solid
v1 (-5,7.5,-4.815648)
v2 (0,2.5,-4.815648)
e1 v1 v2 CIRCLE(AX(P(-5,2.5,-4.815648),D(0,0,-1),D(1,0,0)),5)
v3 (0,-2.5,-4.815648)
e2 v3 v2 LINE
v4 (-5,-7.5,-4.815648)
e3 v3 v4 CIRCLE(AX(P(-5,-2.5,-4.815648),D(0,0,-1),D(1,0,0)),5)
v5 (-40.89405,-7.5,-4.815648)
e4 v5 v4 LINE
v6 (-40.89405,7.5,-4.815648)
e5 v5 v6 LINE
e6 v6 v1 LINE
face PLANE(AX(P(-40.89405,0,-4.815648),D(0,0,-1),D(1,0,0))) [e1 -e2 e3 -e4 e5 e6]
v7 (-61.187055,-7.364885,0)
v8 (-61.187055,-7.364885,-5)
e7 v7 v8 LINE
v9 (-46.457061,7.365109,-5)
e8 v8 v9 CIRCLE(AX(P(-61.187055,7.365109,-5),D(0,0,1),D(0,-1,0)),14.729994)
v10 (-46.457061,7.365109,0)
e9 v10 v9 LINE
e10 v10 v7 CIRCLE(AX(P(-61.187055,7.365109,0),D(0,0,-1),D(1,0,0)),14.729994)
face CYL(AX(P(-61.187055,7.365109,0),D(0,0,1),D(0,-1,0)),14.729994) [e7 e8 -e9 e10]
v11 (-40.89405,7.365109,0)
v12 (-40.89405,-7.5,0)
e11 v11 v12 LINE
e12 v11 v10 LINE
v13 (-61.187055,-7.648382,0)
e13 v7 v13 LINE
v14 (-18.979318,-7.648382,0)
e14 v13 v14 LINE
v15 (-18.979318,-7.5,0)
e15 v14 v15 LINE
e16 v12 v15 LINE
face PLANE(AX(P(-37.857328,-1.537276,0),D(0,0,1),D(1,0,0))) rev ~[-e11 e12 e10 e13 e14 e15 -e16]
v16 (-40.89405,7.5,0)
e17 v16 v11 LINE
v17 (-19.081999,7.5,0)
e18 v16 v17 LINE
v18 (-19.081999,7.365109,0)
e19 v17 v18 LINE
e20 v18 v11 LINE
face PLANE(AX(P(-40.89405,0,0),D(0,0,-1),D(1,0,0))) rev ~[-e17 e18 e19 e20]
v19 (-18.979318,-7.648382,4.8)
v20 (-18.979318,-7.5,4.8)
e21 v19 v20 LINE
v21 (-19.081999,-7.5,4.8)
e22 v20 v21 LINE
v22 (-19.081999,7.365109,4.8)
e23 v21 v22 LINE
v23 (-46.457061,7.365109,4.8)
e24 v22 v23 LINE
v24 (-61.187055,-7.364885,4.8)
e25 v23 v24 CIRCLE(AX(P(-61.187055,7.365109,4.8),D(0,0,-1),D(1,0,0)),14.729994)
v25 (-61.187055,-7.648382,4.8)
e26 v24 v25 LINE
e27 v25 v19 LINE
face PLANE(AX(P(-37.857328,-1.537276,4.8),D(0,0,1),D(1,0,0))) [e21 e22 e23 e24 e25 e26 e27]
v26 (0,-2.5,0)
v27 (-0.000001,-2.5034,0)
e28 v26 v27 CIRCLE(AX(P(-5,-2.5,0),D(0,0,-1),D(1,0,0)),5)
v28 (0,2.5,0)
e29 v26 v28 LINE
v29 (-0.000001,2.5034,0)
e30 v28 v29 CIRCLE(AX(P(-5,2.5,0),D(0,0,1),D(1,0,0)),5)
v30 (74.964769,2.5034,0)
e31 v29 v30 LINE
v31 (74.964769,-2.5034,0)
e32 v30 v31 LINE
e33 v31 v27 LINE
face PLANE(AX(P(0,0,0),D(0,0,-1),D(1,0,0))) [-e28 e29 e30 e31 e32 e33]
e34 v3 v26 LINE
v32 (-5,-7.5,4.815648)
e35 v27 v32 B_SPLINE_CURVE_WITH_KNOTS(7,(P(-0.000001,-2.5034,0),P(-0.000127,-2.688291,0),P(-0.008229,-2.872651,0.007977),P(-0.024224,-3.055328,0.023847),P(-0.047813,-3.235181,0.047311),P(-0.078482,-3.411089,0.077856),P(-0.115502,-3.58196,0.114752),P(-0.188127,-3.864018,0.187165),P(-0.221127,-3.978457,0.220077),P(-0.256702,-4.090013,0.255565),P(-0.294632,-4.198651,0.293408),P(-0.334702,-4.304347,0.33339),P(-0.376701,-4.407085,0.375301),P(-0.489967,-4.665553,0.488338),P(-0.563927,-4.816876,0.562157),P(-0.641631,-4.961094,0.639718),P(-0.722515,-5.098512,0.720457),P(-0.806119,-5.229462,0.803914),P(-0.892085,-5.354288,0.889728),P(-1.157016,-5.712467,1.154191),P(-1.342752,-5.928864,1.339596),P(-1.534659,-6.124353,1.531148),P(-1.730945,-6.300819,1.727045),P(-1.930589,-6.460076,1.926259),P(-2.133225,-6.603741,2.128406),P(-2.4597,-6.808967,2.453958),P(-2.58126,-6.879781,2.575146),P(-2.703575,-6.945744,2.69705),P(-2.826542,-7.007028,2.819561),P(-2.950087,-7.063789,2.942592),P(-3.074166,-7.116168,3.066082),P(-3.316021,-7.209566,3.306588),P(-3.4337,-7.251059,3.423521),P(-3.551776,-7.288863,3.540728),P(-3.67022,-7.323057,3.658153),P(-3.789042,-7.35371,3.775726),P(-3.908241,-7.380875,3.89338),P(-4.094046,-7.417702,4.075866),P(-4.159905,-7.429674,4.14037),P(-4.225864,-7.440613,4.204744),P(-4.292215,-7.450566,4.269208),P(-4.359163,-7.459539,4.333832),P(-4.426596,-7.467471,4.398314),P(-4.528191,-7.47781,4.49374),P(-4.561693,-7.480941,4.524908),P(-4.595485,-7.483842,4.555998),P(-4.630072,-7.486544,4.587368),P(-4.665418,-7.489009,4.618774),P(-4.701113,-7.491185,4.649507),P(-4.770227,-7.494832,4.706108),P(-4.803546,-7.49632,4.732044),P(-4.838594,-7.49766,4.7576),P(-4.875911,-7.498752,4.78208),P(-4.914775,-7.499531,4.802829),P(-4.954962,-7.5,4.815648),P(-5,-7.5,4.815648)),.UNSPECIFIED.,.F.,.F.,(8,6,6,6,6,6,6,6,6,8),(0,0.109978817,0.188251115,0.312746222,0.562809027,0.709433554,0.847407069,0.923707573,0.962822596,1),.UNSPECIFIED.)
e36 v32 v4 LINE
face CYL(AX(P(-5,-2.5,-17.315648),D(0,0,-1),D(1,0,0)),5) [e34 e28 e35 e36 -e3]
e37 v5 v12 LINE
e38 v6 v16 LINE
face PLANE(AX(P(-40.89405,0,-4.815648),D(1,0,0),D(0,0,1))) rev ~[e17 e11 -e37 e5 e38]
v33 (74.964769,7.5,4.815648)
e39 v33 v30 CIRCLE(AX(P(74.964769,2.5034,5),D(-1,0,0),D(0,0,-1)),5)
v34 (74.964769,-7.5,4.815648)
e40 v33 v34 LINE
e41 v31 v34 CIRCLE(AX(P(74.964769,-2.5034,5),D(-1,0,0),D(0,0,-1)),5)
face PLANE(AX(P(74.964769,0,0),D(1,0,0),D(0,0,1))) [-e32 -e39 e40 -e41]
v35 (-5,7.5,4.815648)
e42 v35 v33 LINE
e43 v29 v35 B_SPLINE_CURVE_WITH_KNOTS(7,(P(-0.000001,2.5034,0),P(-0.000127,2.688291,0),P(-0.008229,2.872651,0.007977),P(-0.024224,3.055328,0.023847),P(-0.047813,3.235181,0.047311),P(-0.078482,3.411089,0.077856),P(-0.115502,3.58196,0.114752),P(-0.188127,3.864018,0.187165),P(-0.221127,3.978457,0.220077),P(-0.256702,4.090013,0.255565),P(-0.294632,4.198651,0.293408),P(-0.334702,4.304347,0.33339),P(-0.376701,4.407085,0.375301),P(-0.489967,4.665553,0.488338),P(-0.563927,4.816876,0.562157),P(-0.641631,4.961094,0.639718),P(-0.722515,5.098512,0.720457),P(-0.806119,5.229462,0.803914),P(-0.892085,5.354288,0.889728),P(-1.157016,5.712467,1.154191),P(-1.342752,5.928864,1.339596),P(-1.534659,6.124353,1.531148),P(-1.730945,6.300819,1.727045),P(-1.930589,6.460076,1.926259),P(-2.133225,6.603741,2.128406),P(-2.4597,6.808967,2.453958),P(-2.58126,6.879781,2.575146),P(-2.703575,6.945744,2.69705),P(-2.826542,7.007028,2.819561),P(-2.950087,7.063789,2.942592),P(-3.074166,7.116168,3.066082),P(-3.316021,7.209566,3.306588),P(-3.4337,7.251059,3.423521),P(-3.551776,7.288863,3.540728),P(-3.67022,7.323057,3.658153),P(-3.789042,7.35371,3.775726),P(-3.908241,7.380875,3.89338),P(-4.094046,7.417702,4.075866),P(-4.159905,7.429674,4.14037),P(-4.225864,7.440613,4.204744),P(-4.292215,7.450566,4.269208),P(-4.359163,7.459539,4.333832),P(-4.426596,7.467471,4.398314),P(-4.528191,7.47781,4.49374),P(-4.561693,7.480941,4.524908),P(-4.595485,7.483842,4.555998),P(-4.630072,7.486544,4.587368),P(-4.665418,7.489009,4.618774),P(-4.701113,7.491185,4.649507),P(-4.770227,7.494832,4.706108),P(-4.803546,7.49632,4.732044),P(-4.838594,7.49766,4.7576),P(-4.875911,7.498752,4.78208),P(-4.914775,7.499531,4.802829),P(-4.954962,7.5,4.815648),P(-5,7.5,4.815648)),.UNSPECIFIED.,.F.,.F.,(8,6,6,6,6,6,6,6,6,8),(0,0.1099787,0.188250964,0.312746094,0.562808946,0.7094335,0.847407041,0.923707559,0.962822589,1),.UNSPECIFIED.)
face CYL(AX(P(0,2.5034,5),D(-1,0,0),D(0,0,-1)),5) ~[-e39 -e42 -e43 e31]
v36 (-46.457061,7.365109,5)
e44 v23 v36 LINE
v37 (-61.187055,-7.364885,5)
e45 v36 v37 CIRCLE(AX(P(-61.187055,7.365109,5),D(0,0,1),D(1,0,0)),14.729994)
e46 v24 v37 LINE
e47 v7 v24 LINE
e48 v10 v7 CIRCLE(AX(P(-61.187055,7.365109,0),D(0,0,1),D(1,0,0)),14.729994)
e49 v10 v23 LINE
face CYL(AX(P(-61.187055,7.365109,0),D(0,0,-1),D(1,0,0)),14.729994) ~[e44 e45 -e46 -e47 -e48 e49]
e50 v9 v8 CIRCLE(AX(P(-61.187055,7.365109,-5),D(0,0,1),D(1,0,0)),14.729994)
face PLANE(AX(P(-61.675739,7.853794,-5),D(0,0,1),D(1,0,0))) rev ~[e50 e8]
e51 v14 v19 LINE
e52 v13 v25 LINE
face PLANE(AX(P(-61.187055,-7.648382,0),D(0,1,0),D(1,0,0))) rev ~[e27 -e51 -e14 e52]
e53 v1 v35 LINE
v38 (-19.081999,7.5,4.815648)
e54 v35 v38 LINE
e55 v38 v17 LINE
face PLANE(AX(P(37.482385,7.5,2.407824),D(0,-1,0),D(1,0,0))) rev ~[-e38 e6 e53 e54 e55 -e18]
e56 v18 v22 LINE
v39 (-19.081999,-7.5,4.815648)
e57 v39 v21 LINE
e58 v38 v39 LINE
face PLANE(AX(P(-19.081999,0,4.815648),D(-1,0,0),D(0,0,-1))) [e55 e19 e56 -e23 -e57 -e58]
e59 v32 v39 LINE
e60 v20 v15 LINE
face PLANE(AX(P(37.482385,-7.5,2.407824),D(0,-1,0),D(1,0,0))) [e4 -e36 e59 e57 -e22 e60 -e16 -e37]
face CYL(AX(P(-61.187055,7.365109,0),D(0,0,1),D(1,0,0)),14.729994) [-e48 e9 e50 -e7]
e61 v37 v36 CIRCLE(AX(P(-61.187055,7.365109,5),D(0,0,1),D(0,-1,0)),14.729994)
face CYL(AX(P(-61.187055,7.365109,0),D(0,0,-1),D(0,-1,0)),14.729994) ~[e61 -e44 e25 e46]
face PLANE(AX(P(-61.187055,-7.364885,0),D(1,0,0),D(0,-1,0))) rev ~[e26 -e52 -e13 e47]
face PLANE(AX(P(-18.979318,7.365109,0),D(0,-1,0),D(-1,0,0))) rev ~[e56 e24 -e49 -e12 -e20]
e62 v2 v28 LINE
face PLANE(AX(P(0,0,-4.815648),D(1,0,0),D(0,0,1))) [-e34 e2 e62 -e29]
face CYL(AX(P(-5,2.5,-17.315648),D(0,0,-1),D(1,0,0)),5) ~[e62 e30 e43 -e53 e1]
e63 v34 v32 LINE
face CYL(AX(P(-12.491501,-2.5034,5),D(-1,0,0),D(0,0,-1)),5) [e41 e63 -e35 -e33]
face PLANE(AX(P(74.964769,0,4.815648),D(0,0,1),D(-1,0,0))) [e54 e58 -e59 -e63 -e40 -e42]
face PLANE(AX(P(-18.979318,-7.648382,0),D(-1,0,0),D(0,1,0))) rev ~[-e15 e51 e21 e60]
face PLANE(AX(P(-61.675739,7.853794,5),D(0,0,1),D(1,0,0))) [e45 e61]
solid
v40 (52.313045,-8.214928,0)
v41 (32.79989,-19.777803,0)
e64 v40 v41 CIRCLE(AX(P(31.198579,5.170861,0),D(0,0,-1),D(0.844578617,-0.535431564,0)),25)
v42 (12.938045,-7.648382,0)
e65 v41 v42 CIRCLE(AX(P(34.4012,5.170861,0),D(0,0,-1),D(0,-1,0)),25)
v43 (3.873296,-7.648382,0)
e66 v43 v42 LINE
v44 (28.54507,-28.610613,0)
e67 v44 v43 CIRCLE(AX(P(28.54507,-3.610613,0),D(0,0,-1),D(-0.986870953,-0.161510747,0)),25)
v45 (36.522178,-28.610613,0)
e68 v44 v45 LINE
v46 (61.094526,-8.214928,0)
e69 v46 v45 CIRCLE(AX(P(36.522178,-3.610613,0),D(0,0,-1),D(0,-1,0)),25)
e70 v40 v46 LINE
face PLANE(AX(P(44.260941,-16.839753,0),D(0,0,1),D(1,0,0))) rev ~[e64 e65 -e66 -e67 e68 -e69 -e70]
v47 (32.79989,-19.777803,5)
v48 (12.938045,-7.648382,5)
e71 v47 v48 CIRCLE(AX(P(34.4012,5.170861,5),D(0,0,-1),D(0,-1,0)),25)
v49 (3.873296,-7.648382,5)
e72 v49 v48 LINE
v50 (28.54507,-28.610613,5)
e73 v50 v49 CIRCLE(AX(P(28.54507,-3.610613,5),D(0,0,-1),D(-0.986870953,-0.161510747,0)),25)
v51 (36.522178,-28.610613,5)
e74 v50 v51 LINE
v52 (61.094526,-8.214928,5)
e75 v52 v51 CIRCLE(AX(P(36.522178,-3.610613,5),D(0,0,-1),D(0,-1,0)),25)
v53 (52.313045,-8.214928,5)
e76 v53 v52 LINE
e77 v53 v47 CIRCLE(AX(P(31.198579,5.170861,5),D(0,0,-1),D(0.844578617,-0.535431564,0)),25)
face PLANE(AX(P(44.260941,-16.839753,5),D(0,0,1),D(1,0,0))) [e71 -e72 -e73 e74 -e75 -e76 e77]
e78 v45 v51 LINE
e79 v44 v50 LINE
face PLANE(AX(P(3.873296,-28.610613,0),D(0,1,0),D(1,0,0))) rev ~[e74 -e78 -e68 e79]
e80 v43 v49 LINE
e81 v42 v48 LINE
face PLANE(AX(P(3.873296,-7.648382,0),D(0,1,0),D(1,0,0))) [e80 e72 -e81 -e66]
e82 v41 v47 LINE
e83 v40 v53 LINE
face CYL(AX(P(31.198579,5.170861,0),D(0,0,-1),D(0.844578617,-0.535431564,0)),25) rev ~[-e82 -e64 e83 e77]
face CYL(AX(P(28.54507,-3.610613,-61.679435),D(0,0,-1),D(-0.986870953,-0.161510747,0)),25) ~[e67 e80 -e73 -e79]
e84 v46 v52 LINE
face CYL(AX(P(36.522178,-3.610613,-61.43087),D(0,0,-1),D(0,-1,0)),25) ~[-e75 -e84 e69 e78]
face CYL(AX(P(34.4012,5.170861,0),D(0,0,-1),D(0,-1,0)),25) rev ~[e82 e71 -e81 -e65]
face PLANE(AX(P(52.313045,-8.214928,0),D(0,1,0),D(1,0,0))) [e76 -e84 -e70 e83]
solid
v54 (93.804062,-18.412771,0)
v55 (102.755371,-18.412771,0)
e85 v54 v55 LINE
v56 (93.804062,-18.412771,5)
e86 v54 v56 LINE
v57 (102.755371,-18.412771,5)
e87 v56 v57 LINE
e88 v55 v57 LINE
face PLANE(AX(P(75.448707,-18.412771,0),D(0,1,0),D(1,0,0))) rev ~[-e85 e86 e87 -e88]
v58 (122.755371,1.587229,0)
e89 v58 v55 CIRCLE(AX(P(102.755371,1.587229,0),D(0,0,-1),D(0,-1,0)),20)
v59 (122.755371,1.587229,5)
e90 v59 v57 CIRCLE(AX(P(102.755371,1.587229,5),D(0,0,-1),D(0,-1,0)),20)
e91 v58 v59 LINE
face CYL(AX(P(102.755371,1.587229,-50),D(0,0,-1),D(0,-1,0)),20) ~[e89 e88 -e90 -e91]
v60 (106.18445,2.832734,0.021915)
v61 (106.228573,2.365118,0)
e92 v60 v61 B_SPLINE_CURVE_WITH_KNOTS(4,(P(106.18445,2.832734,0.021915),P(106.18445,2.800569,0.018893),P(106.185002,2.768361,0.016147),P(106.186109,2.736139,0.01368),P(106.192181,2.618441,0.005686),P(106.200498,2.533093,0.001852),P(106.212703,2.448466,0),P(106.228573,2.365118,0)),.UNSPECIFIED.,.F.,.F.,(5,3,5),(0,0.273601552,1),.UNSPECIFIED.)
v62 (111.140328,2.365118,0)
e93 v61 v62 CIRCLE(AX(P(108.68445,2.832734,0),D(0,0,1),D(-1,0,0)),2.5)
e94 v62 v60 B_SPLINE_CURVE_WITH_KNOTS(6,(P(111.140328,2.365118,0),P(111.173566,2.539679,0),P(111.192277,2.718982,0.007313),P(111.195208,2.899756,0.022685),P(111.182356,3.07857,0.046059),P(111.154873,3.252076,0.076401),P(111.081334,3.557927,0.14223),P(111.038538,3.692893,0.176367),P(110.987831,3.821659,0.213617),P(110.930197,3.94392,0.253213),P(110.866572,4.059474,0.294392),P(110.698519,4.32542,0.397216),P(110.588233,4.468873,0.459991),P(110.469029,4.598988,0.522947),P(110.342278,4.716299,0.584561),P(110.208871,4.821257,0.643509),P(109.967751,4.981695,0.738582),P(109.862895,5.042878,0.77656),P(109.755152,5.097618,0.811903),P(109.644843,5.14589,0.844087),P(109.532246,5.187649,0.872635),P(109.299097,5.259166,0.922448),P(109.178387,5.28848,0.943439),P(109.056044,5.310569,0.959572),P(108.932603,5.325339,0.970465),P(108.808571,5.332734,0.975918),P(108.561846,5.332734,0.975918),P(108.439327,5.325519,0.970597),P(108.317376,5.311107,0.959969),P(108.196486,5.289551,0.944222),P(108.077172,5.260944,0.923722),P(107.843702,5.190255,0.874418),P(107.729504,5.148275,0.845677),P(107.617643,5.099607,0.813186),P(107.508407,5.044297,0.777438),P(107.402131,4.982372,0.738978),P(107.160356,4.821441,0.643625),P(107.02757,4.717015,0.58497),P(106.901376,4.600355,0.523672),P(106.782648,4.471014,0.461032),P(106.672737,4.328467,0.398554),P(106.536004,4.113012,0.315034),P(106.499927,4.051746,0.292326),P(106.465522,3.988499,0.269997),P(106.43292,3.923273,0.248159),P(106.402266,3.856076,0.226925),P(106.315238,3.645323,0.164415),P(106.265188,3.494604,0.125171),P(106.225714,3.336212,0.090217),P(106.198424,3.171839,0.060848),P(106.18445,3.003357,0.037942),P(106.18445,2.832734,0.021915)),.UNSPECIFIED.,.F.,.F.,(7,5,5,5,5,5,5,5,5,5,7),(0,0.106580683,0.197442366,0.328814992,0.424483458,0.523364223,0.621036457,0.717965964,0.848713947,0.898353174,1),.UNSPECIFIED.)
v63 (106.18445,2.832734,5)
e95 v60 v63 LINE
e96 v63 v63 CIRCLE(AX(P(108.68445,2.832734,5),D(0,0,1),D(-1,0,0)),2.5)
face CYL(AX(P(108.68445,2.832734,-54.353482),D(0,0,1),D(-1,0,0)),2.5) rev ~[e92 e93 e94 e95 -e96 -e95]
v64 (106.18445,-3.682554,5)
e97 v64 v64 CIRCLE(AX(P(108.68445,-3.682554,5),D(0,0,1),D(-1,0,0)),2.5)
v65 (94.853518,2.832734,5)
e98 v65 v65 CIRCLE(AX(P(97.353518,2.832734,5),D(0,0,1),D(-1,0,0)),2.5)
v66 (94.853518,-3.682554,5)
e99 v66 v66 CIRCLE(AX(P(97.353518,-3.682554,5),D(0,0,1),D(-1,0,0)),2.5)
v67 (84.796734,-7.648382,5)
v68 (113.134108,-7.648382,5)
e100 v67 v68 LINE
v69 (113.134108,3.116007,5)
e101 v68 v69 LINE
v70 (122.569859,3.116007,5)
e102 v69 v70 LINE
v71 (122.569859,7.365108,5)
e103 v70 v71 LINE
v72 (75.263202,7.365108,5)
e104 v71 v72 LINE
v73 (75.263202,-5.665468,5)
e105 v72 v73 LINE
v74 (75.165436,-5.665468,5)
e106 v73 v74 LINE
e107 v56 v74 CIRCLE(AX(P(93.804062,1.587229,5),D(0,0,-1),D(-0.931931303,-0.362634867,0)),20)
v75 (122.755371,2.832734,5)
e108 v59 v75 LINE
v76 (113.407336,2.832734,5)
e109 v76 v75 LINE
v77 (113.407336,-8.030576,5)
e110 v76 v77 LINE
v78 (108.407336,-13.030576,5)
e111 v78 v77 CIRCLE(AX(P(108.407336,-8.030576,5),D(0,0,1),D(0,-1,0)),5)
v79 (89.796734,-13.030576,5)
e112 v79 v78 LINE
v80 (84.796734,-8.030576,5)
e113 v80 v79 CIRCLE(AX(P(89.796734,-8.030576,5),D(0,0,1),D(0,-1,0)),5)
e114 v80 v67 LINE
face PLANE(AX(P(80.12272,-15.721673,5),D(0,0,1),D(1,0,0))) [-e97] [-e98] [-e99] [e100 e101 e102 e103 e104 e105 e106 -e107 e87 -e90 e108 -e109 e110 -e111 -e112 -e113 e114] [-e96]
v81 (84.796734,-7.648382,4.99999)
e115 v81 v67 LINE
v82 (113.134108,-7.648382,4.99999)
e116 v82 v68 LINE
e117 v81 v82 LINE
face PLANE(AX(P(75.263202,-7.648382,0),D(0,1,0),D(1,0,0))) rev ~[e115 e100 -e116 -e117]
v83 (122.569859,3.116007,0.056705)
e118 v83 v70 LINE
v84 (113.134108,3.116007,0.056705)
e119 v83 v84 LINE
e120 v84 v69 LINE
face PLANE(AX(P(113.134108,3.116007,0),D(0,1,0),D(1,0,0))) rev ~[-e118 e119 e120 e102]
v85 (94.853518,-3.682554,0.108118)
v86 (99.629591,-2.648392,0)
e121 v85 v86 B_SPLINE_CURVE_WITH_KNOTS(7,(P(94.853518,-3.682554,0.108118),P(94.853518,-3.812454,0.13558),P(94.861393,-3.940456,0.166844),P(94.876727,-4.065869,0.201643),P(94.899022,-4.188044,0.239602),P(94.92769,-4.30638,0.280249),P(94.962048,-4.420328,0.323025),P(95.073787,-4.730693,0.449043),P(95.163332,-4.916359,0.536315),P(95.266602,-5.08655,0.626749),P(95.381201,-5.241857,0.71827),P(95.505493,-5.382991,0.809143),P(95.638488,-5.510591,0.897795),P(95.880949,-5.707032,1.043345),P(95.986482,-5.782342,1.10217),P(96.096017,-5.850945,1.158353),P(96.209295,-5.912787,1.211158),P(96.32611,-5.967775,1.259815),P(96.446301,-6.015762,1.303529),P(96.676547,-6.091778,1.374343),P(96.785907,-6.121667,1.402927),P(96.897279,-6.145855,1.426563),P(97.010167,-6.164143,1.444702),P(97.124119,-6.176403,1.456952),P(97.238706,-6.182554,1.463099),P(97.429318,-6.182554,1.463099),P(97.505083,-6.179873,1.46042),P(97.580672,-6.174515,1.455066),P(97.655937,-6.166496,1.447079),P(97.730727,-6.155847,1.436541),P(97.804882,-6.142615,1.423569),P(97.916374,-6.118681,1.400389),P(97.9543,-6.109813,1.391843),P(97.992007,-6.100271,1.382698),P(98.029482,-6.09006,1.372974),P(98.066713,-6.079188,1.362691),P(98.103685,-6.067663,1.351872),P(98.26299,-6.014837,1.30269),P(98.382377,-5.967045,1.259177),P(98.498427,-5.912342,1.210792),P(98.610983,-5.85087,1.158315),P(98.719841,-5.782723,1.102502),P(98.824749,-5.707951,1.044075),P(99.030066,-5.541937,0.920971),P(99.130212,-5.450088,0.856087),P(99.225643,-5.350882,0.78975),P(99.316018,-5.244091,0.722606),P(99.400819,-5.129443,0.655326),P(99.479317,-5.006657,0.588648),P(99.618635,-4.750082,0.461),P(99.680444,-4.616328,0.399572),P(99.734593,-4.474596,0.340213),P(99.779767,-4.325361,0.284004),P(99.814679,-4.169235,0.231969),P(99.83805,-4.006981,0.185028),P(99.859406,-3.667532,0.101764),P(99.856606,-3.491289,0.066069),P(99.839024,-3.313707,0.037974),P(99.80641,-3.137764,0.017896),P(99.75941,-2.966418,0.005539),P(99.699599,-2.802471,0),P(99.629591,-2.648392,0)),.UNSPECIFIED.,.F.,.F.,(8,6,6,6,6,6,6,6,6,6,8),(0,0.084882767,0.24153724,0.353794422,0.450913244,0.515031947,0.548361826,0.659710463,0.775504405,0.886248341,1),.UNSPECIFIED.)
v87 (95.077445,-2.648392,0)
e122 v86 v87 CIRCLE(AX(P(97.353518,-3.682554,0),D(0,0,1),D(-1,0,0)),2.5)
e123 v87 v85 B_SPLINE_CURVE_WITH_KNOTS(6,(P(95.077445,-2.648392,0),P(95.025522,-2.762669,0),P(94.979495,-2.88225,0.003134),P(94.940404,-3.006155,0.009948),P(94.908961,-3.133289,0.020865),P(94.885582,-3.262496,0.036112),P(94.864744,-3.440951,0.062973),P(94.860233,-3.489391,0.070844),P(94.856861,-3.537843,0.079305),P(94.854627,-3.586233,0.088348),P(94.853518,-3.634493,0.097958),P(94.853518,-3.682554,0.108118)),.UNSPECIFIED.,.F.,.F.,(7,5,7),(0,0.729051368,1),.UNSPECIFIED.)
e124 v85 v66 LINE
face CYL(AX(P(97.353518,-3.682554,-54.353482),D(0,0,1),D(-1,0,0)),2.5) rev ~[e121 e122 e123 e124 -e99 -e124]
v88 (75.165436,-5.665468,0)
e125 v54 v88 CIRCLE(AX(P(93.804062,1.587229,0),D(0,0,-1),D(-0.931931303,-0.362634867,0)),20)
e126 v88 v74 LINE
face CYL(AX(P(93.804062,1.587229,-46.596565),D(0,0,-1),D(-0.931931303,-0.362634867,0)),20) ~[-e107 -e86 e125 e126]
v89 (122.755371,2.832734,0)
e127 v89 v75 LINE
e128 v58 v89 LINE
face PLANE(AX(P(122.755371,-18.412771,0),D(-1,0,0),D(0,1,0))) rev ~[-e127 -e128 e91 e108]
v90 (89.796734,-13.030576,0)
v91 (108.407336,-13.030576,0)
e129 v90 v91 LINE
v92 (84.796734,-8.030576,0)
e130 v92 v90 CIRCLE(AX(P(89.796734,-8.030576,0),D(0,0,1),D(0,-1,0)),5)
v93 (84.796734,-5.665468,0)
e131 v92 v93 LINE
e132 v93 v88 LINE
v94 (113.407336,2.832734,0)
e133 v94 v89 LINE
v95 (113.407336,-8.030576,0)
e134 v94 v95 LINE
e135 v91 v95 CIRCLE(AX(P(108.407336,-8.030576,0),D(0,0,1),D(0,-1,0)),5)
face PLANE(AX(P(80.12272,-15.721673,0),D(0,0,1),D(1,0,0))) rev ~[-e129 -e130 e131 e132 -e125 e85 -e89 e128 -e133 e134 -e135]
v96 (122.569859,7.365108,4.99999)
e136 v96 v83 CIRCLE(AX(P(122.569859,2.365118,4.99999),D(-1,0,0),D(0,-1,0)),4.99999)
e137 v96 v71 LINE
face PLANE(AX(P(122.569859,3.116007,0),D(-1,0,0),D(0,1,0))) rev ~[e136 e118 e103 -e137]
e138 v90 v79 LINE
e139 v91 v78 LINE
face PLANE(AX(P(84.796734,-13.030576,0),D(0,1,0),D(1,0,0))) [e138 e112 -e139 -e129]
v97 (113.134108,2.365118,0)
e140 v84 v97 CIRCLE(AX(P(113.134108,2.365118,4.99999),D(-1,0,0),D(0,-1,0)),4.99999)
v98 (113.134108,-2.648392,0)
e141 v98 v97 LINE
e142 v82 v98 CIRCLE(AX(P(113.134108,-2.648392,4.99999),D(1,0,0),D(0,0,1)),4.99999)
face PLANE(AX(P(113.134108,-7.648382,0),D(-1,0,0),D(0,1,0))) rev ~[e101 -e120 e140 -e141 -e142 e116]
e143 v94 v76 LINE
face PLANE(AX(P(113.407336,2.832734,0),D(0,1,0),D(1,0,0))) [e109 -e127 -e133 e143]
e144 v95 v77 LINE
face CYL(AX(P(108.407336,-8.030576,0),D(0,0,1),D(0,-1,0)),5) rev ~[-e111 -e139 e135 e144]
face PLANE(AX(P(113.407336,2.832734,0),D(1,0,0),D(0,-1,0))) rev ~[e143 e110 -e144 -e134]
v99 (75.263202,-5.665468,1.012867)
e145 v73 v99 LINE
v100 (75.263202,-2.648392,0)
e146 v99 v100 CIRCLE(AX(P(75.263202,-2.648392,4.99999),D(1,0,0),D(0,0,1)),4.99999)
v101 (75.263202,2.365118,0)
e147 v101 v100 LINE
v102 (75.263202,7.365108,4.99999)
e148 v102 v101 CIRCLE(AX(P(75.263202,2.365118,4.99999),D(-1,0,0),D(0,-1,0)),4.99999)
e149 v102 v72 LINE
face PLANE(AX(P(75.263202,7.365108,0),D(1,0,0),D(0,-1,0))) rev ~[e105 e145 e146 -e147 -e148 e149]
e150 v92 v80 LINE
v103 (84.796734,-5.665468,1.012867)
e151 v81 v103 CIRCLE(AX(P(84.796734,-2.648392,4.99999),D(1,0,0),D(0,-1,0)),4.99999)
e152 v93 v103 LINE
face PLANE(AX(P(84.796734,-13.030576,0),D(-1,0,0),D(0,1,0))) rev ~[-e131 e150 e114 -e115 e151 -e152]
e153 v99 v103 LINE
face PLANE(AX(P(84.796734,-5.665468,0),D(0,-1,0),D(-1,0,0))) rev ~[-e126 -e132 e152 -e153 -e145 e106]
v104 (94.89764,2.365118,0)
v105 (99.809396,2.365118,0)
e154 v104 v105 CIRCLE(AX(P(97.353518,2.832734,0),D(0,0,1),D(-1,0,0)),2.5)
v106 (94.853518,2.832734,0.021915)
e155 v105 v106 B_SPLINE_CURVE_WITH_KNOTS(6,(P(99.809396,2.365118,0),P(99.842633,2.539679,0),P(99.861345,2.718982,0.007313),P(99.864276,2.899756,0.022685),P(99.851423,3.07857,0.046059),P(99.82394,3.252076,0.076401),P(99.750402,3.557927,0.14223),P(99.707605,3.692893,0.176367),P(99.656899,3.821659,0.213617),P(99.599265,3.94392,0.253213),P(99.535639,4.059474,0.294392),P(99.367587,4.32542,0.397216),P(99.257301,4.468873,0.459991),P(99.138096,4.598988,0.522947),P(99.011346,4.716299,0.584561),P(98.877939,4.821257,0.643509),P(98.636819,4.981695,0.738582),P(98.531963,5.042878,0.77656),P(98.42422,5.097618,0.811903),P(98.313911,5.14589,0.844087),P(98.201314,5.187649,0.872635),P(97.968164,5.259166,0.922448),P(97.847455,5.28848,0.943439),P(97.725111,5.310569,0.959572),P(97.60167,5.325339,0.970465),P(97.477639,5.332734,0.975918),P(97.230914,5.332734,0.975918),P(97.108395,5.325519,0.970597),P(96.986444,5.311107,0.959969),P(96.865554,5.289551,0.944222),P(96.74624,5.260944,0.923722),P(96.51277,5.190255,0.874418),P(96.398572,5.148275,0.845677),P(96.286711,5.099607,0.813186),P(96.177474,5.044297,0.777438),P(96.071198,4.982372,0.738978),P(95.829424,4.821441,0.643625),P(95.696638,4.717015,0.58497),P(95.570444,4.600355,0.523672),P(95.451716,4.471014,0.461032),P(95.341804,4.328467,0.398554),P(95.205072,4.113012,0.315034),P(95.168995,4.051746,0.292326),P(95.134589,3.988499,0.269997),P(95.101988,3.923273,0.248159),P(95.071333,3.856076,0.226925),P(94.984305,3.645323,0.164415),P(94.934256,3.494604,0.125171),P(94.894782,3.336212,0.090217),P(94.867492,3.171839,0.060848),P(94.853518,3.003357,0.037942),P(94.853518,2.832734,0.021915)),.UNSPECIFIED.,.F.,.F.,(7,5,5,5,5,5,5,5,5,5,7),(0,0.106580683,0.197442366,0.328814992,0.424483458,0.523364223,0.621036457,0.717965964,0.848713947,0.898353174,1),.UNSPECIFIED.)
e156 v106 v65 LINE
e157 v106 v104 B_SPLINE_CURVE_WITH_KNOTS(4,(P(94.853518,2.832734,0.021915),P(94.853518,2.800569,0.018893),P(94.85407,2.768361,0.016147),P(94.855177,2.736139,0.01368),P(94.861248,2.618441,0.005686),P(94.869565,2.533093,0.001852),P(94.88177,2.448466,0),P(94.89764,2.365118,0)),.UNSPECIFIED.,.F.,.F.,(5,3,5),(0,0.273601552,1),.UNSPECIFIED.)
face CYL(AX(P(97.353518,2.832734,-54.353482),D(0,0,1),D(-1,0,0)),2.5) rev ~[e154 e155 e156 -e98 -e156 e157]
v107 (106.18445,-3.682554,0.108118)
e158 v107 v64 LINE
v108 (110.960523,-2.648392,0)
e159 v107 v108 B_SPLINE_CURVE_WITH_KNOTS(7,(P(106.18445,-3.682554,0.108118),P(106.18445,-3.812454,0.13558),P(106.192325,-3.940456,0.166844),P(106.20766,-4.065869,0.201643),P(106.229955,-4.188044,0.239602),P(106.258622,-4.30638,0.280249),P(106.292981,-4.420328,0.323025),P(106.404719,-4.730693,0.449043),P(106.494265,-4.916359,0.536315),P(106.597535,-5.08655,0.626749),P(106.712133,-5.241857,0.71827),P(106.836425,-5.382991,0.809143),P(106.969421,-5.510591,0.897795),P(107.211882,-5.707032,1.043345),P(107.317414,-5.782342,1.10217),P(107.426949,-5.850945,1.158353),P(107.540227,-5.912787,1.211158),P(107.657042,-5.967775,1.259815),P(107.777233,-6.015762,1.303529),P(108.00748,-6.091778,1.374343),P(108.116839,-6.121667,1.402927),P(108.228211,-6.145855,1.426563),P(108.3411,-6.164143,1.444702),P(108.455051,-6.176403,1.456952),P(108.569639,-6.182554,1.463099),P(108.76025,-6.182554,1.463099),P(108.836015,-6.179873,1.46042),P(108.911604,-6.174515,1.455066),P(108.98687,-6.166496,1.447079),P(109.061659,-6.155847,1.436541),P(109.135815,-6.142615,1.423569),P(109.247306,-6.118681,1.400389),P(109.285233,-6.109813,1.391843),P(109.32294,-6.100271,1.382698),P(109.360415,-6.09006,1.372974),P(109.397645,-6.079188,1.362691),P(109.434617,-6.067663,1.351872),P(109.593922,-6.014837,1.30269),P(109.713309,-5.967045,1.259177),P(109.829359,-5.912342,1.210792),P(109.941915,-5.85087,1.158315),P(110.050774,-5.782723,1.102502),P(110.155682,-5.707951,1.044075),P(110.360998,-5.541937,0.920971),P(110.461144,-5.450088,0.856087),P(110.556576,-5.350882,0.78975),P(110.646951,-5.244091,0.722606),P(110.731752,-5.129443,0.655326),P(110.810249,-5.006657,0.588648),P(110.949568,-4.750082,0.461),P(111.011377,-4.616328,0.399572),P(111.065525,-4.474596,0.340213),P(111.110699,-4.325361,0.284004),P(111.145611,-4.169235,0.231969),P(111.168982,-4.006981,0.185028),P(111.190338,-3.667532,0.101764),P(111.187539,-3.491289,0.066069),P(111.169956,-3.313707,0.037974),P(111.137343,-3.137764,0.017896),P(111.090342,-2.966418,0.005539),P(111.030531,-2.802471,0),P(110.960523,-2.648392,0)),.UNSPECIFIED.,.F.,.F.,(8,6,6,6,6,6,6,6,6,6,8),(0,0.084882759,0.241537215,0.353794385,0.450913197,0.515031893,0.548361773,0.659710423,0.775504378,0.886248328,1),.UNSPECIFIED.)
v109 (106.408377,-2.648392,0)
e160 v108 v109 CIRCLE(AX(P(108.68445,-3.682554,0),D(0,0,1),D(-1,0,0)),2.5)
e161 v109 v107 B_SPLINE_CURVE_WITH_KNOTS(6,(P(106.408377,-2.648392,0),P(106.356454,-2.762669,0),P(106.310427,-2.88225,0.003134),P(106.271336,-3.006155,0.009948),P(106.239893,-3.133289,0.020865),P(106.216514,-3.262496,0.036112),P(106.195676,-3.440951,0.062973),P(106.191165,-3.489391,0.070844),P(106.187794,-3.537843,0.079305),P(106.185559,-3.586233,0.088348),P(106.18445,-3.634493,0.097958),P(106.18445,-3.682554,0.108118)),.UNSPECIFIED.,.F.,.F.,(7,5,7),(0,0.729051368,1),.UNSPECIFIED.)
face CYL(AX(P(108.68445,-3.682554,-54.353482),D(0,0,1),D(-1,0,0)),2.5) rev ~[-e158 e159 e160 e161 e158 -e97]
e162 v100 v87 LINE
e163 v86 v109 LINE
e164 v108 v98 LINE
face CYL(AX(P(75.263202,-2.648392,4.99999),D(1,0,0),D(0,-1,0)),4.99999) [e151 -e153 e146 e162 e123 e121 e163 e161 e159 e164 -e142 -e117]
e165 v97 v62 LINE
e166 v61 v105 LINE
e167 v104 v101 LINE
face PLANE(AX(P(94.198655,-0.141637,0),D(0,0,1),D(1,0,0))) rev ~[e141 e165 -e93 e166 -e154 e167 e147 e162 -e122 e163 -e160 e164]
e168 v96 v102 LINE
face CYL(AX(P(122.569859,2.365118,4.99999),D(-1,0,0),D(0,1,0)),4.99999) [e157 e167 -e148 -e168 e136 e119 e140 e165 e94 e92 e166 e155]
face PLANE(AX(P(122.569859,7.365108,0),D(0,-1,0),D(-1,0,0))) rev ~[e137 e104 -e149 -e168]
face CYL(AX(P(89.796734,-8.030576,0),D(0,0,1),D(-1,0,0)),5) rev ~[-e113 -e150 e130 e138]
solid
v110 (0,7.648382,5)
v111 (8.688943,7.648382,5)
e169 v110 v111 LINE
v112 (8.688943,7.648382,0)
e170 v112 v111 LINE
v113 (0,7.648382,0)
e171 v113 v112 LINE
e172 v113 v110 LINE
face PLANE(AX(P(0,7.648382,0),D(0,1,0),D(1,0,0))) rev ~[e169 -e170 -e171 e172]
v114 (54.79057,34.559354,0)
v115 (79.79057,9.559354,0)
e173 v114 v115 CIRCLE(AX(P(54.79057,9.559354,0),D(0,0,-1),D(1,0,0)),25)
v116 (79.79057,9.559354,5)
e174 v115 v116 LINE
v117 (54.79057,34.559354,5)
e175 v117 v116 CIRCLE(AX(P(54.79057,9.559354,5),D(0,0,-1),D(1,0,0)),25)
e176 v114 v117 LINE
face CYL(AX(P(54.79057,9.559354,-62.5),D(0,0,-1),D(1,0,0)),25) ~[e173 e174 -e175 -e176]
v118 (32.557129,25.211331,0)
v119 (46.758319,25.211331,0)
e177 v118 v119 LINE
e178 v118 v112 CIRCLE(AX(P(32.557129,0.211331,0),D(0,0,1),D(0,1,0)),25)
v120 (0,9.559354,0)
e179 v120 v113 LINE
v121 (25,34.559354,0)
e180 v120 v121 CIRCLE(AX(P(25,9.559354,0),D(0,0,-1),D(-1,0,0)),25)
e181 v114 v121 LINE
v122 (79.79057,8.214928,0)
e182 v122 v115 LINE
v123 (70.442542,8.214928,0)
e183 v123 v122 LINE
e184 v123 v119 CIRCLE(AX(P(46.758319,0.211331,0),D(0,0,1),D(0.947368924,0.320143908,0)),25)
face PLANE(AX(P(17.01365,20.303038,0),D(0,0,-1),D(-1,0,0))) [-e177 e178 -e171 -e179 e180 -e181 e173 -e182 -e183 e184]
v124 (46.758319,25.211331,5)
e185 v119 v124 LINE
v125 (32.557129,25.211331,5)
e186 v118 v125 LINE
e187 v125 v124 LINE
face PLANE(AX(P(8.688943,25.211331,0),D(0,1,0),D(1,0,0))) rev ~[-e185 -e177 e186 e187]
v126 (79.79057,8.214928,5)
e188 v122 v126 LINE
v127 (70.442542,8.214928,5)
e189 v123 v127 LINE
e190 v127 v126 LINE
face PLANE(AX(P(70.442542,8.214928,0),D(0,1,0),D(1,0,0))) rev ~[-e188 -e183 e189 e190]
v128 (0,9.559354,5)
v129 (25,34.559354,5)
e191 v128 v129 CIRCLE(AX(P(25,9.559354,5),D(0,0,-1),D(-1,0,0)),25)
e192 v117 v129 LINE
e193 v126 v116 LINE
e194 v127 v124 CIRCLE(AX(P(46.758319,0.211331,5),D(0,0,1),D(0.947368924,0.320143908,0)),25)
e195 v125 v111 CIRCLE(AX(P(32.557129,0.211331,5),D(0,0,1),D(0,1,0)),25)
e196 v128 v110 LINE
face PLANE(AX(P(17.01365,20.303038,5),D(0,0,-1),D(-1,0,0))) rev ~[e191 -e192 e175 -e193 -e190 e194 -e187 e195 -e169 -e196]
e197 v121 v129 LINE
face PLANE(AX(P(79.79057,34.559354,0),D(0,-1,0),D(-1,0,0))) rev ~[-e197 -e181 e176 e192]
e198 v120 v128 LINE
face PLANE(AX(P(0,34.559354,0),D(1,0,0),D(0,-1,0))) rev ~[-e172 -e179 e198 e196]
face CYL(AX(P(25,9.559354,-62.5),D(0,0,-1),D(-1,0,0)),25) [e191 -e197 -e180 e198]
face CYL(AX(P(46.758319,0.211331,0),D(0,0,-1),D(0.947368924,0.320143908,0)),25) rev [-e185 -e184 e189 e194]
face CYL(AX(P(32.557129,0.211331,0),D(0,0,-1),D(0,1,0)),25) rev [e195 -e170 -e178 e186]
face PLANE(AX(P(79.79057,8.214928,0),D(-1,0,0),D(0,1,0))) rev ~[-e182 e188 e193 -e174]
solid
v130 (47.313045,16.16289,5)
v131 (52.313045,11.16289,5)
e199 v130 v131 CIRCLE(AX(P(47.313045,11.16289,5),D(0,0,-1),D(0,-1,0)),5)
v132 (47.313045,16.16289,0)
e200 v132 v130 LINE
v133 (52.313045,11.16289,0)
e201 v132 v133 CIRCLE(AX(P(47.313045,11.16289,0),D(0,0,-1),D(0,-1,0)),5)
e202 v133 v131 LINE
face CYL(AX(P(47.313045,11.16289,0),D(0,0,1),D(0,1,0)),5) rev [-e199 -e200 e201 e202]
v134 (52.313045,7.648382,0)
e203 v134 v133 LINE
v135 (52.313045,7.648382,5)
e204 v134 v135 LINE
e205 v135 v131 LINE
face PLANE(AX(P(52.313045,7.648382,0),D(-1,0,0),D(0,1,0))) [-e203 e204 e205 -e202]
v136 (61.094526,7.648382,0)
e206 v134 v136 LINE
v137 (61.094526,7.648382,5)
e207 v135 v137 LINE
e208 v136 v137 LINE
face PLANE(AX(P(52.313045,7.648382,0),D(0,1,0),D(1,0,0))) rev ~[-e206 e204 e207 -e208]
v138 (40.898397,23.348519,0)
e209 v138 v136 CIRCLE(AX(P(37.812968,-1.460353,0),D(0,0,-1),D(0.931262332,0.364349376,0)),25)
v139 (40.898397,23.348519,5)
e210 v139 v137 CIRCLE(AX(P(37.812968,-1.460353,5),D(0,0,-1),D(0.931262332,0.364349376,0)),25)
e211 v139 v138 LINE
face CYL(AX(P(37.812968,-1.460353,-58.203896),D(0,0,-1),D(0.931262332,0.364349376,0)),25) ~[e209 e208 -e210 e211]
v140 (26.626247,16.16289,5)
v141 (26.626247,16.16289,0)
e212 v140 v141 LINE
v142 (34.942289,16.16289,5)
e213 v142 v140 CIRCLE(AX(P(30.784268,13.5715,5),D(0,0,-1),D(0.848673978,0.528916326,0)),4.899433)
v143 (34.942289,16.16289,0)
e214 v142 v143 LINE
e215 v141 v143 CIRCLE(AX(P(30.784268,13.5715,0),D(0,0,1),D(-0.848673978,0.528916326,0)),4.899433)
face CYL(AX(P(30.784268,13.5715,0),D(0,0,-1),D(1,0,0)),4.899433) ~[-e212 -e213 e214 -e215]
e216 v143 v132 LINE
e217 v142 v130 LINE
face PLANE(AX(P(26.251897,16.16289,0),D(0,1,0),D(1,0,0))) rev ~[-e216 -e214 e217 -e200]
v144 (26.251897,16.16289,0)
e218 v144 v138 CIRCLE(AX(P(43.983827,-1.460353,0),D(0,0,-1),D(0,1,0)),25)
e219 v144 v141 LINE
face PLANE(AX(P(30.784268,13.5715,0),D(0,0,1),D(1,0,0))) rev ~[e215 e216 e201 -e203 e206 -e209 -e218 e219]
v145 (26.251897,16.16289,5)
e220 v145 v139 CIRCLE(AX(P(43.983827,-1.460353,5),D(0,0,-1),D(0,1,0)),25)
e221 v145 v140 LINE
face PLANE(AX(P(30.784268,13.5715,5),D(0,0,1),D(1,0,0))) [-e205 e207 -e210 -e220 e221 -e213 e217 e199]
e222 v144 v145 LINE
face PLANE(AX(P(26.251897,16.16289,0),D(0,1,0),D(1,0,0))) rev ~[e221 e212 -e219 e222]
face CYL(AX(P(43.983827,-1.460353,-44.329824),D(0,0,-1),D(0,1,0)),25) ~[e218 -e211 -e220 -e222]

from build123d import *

# Parameters (mm, degrees)
F0_W           = 74.9647691846
F0_H           = 4.8156478442
F0_W_2         = 21.8120515347
F1_DEPTH       = 7.5
F2_T1_DEPTH    = 87.4562698657
F2_T3_DEPTH    = 17.3156478442
F2_T9_DEPTH    = 87.4562698657
F2_T13_DEPTH   = 17.3156478442
F2_T21_DEPTH   = 87.4562698657
F2_T25_DEPTH   = 17.3156478442
F4_DEPTH       = 4.8
F5_DEPTH       = 5
F6_W           = 9.4357505441
F6_H           = 4.2491005734
F7_DEPTH       = 5
F8_R           = 4.99999
F9_W           = 9.3480274081
F9_H           = 5.3821951151
F9_W_2         = 9.3480348587
F9_H_2         = 4.8156473786
F9_H_3         = 5.5238311179
F9_W_3         = 28.6106020212
F10_DEPTH      = 5
F11_T1_DEPTH   = 98.1931302685
F11_T3_DEPTH   = 105
F13_D          = 5
F14_D          = 5
F15_D          = 5
F16_D          = 5
F17_W          = 9.3480274081
F17_H          = 16.9964022934
F17_W_2        = 61.7535989732
F17_H_2        = 9.3480236828
F18_DEPTH      = 5
F17_W_3        = 9.0647486504
F17_H_3        = 12.1807572432
F17_H_4        = 8.7814740837
F17_W_4        = 39.374999702
F17_W_5        = 8.7814815342
F17_H_5        = 11.6142109036
F17_H_6        = 8.5145081393
F17_W_6        = 26.0611474514
F17_H_7        = 7.3767574504
F19_T1_DEPTH   = 5
F19_T3_DEPTH   = 5
F19_T5_DEPTH   = 130
F19_T7_DEPTH   = 130
F19_2_T1_DEPTH = 5
F19_2_T3_DEPTH = 127.8617396979
F19_2_T5_DEPTH = 128.3588691726
F19_3_T1_DEPTH = 121.4077915609
F19_3_T3_DEPTH = 93.6596472526
F20_R          = 4.8994331179
F21_DEPTH      = 5
F22_R          = 5
F22_2_R        = 5


# Not quite as in the source:
# - a fillet or chamfer that OpenCascade refuses, or shapes differently, is made with other operations: its cross-section is extruded or revolved along the edge and cut away or added
# - a fillet or chamfer is up to 0.001 mm smaller than in the source, because OpenCascade refuses the exact size


with BuildPart() as f1:
    # F0 (on Front) → F1 (new body, symmetric)
    with BuildSketch(Plane.XZ):
        with Locations((37.4823845923, 2.4078239221)):
            Rectangle(F0_W, F0_H)
        Polygon((0, -4.8156478442), (0, 0), (0, 4.8156478442), (-19.0819986165, 4.8156478442), (-19.0819986165, 0), (-19.0819986165, -4.8156478442), align=None)
        with Locations((-29.9880243838, -2.4078239221)):
            Rectangle(F0_W_2, F0_H)
    extrude(amount=F1_DEPTH, both=True)

    # F2: fillet of radius 5 on 4 edges, made by hand

    # F2_s2 → F2_t1 (cut)
    with BuildSketch(Plane.YZ):
        with BuildLine():
            ThreePointArc((-2.5033997275, 0), (-5.9731431778, 1.3998777258), (-7.5, 4.8156478442))
            Line((-7.5, 4.8156478442), (-7.5, 0))
            Line((-7.5, 0), (-2.5033997275, 0))
        make_face()
        with BuildLine():
            ThreePointArc((2.5033997275, 0), (5.9731431778, 1.3998777258), (7.5, 4.8156478442))
            Line((7.5, 4.8156478442), (7.5, 0))
            Line((7.5, 0), (2.5033997275, 0))
        make_face()
    extrude(amount=F2_T1_DEPTH, mode=Mode.SUBTRACT)

    # F2_s4 → F2_t3 (cut)
    with BuildSketch(Plane.XY.offset(-17.3156478442)):
        with BuildLine():
            ThreePointArc((0, -2.5), (-1.4644660941, -6.0355339059), (-5, -7.5))
            Line((-5, -7.5), (0, -7.5))
            Line((0, -7.5), (0, -2.5))
        make_face()
        with BuildLine():
            ThreePointArc((0, 2.5), (-1.4644660941, 6.0355339059), (-5, 7.5))
            Line((-5, 7.5), (0, 7.5))
            Line((0, 7.5), (0, 2.5))
        make_face()
    extrude(amount=F2_T3_DEPTH, mode=Mode.SUBTRACT)


with BuildPart() as f2_tool7:
    # F2_s8 → F2_t9 (new body)
    with BuildSketch(Plane.YZ.offset(-12.4915006811)):
        with BuildLine():
            ThreePointArc((-2.5033997275, 0), (-5.9731431778, 1.3998777258), (-7.5, 4.8156478442))
            Line((-7.5, 4.8156478442), (-7.5, 0))
            Line((-7.5, 0), (-2.5033997275, 0))
        make_face()
    extrude(amount=F2_T9_DEPTH)

    split(bisect_by=Plane.YZ, keep=Keep.BOTTOM)


with BuildPart() as f2_tool11:
    # F2_s12 → F2_t13 (new body)
    with BuildSketch(Plane.XY.offset(-4.8156478442)):
        with BuildLine():
            ThreePointArc((0, -2.5), (-1.4644660941, -6.0355339059), (-5, -7.5))
            Line((-5, -7.5), (0, -7.5))
            Line((0, -7.5), (0, -2.5))
        make_face()
    extrude(amount=F2_T13_DEPTH)

    split(bisect_by=Plane.XY, keep=Keep.TOP)

    split(bisect_by=Plane.XY.offset(4.8156478442), keep=Keep.BOTTOM)


with BuildPart() as f2_tool7_1:
    add(f2_tool7.part)

    # F2_t16: intersect F2_tool11
    add(f2_tool11.part, mode=Mode.INTERSECT)


with BuildPart() as f1_1:
    add(f1.part)

    # F2_t5: cut F2_tool7
    add(f2_tool7_1.part, mode=Mode.SUBTRACT)


with BuildPart() as f2_tool19:
    # F2_s20 → F2_t21 (new body)
    with BuildSketch(Plane.YZ.offset(-12.4915006811)):
        with BuildLine():
            ThreePointArc((2.5033997275, 0), (5.9731431778, 1.3998777258), (7.5, 4.8156478442))
            Line((7.5, 4.8156478442), (7.5, 0))
            Line((7.5, 0), (2.5033997275, 0))
        make_face()
    extrude(amount=F2_T21_DEPTH)

    split(bisect_by=Plane.YZ, keep=Keep.BOTTOM)


with BuildPart() as f2_tool23:
    # F2_s24 → F2_t25 (new body)
    with BuildSketch(Plane.XY.offset(-4.8156478442)):
        with BuildLine():
            ThreePointArc((0, 2.5), (-1.4644660941, 6.0355339059), (-5, 7.5))
            Line((-5, 7.5), (0, 7.5))
            Line((0, 7.5), (0, 2.5))
        make_face()
    extrude(amount=F2_T25_DEPTH)

    split(bisect_by=Plane.XY, keep=Keep.TOP)

    split(bisect_by=Plane.XY.offset(4.8156478442), keep=Keep.BOTTOM)


with BuildPart() as f2_tool19_1:
    add(f2_tool19.part)

    # F2_t28: intersect F2_tool23
    add(f2_tool23.part, mode=Mode.INTERSECT)


with BuildPart() as f1_2:
    add(f1_1.part)

    # F2_t17: cut F2_tool19
    add(f2_tool19_1.part, mode=Mode.SUBTRACT)

    # F3 (on Top) → F4 (join)
    with BuildSketch(Plane.XY):
        with BuildLine():
            Line((-61.1870549619, -7.6483818702), (-18.97931844, -7.6483818702))
            Line((-18.97931844, -7.6483818702), (-18.97931844, 7.3651091661))
            Line((-18.97931844, 7.3651091661), (-46.4570610243, 7.3651091661))
            ThreePointArc((-46.4570610243, 7.3651091661), (-50.7713763618, -3.050569434), (-61.1870549619, -7.3648847715))
            Line((-61.1870549619, -7.3648847715), (-61.1870549619, -7.6483818702))
        make_face()
    extrude(amount=F4_DEPTH)

    # F3 (on Top) → F5 (join, symmetric)
    with BuildSketch(Plane.XY):
        with BuildLine():
            ThreePointArc((-46.4570610243, 7.3651091661), (-71.602733562, 17.7807877663), (-61.1870549619, -7.3648847715))
            Line((-61.1870549619, -7.3648847715), (-61.1870549619, 7.3651091661))
            Line((-61.1870549619, 7.3651091661), (-46.4570610243, 7.3651091661))
        make_face()
        with BuildLine():
            Line((-61.1870549619, 7.3651091661), (-61.1870549619, -7.3648847715))
            ThreePointArc((-61.1870549619, -7.3648847715), (-50.7713763618, -3.050569434), (-46.4570610243, 7.3651091661))
            Line((-46.4570610243, 7.3651091661), (-61.1870549619, 7.3651091661))
        make_face()
    extrude(amount=F5_DEPTH, both=True)


with BuildPart() as f7:
    # F6 (on Top) → F7 (new body)
    with BuildSketch(Plane.XY):
        Polygon((75.2632021904, 7.365108002), (75.2632021904, -7.6483818702), (113.1341084838, -7.6483818702), (113.1341084838, 3.1160074286), (113.1341084838, 7.365108002), align=None)
        with Locations((117.8519837558, 5.2405577153)):
            Rectangle(F6_W, F6_H)
    extrude(amount=F7_DEPTH)

    # F8 (radius 5 in the source; OpenCascade refuses exactly that, so slightly less here)
    f8_edges = [f7.edges().sort_by_distance(p)[0] for p in [
        (94.198655, -7.648382, 0),
        (98.916531, 7.365108, 0),
    ]]
    fillet(f8_edges, radius=F8_R)

    # F9 (on Top) → F10 (join)
    with BuildSketch(Plane.XY):
        with Locations((80.1227204502, -15.7216731459)):
            Rectangle(F9_W, F9_H)
        Polygon((75.4487067461, -13.0305755883), (84.7967341542, -13.0305755883), (84.7967341542, -5.665468052), (75.1654356718, -5.665468052), (75.1654356718, -18.4127707034), (75.4487067461, -18.4127707034), align=None)
        with Locations((118.0813536048, -15.7216731459)):
            Rectangle(F9_W_2, F9_H)
        with Locations((118.0813536048, -10.6227518991)):
            Rectangle(F9_W_2, F9_H_2)
        with Locations((118.0813536048, -5.4530126508)):
            Rectangle(F9_W_2, F9_H_3)
        with Locations((118.0813536048, 0.0708184671)):
            Rectangle(F9_W_2, F9_H_3)
        with Locations((99.1020351648, -15.7216731459)):
            Rectangle(F9_W_3, F9_H)
    extrude(amount=F10_DEPTH)

    # F11: fillet of radius 20 on 2 edges, made by hand

    # F11_s2 → F11_t1 (cut)
    with BuildSketch(Plane.XY.offset(-46.5965651343)):
        with BuildLine():
            ThreePointArc((75.1654356718, -5.665468052), (82.5136664041, -14.9211617058), (93.8040617255, -18.4127707034))
            Line((93.8040617255, -18.4127707034), (75.1654356718, -18.4127707034))
            Line((75.1654356718, -18.4127707034), (75.1654356718, -5.665468052))
        make_face()
    extrude(amount=F11_T1_DEPTH, mode=Mode.SUBTRACT)

    # F11_s4 → F11_t3 (cut)
    with BuildSketch(Plane.XY.offset(-50)):
        with BuildLine():
            ThreePointArc((102.7553710341, -18.4127707034), (116.8975066579, -12.5549063272), (122.7553710341, 1.5872292966))
            Line((122.7553710341, 1.5872292966), (122.7553710341, -18.4127707034))
            Line((122.7553710341, -18.4127707034), (102.7553710341, -18.4127707034))
        make_face()
    extrude(amount=F11_T3_DEPTH, mode=Mode.SUBTRACT)

    # F13 (through all)
    with Locations(Plane(origin=(0, 0, 0), x_dir=(1, 0, 0), z_dir=(0, 0, -1))):
        with Locations((97.3535180092, -2.832734026)):
            Hole(F13_D / 2)

    # F14 (through all)
    with Locations(Plane(origin=(0, 0, 0), x_dir=(1, 0, 0), z_dir=(0, 0, -1))):
        with Locations((97.3535180092, 3.682554001)):
            Hole(F14_D / 2)

    # F15 (through all)
    with Locations(Plane(origin=(0, 0, 0), x_dir=(1, 0, 0), z_dir=(0, 0, -1))):
        with Locations((108.684450388, -2.832734026)):
            Hole(F15_D / 2)

    # F16 (through all)
    with Locations(Plane(origin=(0, 0, 0), x_dir=(1, 0, 0), z_dir=(0, 0, -1))):
        with Locations((108.684450388, 3.682554001)):
            Hole(F16_D / 2)

    # F22
    f22_edges = [f7.edges().sort_by_distance(p)[0] for p in [
        (113.407336, -13.030576, 2.5),
        (84.796734, -13.030576, 2.5),
    ]]
    fillet(f22_edges, radius=F22_R)


with BuildPart() as f18:
    # F17 (on Top) → F18 (new body)
    with BuildSketch(Plane.XY):
        with Locations((75.1165561378, 16.7131293565)):
            Rectangle(F17_W, F17_H)
        with Locations((39.5657429472, 29.8853423446)):
            Rectangle(F17_W_2, F17_H_2)
        with Locations((75.1165561378, 29.8853423446)):
            Rectangle(F17_W, F17_H_2)
        Polygon((8.6889434606, 7.6483818702), (8.6889434606, 25.2113305032), (8.6889434606, 34.5593541861), (0, 34.5593541861), (0, 7.6483818702), align=None)
    extrude(amount=F18_DEPTH)

    # F19: fillet of radius 25 on 4 edges, made by hand

    # F19_s2 → F19_t1 (join)
    with BuildSketch(Plane.XY):
        with BuildLine():
            ThreePointArc((70.4425424337, 8.2149282098), (61.3341564874, 20.5225336023), (46.7583193358, 25.2113305032))
            Line((46.7583193358, 25.2113305032), (70.4425424337, 25.2113305032))
            Line((70.4425424337, 25.2113305032), (70.4425424337, 8.2149282098))
        make_face()
    extrude(amount=F19_T1_DEPTH)

    # F19_s4 → F19_t3 (join)
    with BuildSketch(Plane.XY):
        with BuildLine():
            ThreePointArc((32.5571287071, 25.2113305032), (17.740352475, 20.3474458706), (8.6889434606, 7.6483818702))
            Line((8.6889434606, 7.6483818702), (8.6889434606, 25.2113305032))
            Line((8.6889434606, 25.2113305032), (32.5571287071, 25.2113305032))
        make_face()
    extrude(amount=F19_T3_DEPTH)

    # F19_s6 → F19_t5 (cut)
    with BuildSketch(Plane.XY.offset(-62.5)):
        with BuildLine():
            ThreePointArc((79.7905698419, 9.5593541861), (72.4682393715, 27.2370237157), (54.7905698419, 34.5593541861))
            Line((54.7905698419, 34.5593541861), (79.7905698419, 34.5593541861))
            Line((79.7905698419, 34.5593541861), (79.7905698419, 9.5593541861))
        make_face()
    extrude(amount=F19_T5_DEPTH, mode=Mode.SUBTRACT)

    # F19_s8 → F19_t7 (cut)
    with BuildSketch(Plane.XY.offset(-62.5)):
        with BuildLine():
            ThreePointArc((0, 9.5593541861), (7.3223304703, 27.2370237157), (25, 34.5593541861))
            Line((25, 34.5593541861), (0, 34.5593541861))
            Line((0, 34.5593541861), (0, 9.5593541861))
        make_face()
    extrude(amount=F19_T7_DEPTH, mode=Mode.SUBTRACT)


with BuildPart() as f18b:
    # F17 (on Top) → F18, piece 2 (new body)
    with BuildSketch(Plane.XY):
        with Locations((8.4056706401, -13.7387604918)):
            Rectangle(F17_W_3, F17_H_3)
        with Locations((8.4056706401, -24.2198761553)):
            Rectangle(F17_W_3, F17_H_4)
        with Locations((32.6255448163, -24.2198761553)):
            Rectangle(F17_W_4, F17_H_4)
        with Locations((56.7037854344, -14.0220336616)):
            Rectangle(F17_W_5, F17_H_5)
        with Locations((56.7037854344, -24.2198761553)):
            Rectangle(F17_W_5, F17_H_4)
    extrude(amount=F18_DEPTH)

    # F19#2: fillet of radius 25 on 4 edges, made by hand

    # F19_2_s2 → F19_2_t1 (join)
    with BuildSketch(Plane.XY):
        with BuildLine():
            ThreePointArc((52.3130446672, -8.2149282098), (43.2475475071, -16.7339870632), (31.1985792402, -19.8291391134))
            Line((31.1985792402, -19.8291391134), (52.3130446672, -19.8291391134))
            Line((52.3130446672, -19.8291391134), (52.3130446672, -8.2149282098))
        make_face()
        with BuildLine():
            ThreePointArc((34.4011997926, -19.8291391134), (22.0618535563, -16.571736347), (12.9380449653, -7.6483818702))
            Line((12.9380449653, -7.6483818702), (12.9380449653, -19.8291391134))
            Line((12.9380449653, -19.8291391134), (34.4011997926, -19.8291391134))
        make_face()
    extrude(amount=F19_2_T1_DEPTH)

    # F19_2_s4 → F19_2_t3 (cut)
    with BuildSketch(Plane.XY.offset(-61.430869849)):
        with BuildLine():
            ThreePointArc((36.5221782619, -28.6106131971), (52.4892087417, -22.8473992503), (61.0945262015, -8.2149282098))
            Line((61.0945262015, -8.2149282098), (61.0945262015, -28.6106131971))
            Line((61.0945262015, -28.6106131971), (36.5221782619, -28.6106131971))
        make_face()
    extrude(amount=F19_2_T3_DEPTH, mode=Mode.SUBTRACT)

    # F19_2_s6 → F19_2_t5 (cut)
    with BuildSketch(Plane.XY.offset(-61.6794345863)):
        with BuildLine():
            ThreePointArc((3.8732963149, -7.6483818702), (12.3577945421, -22.662440102), (28.5450701494, -28.6106131971))
            Line((28.5450701494, -28.6106131971), (3.8732963149, -28.6106131971))
            Line((3.8732963149, -28.6106131971), (3.8732963149, -7.6483818702))
        make_face()
    extrude(amount=F19_2_T5_DEPTH, mode=Mode.SUBTRACT)


with BuildPart() as f18c:
    # F17 (on Top) → F18, piece 3 (new body)
    with BuildSketch(Plane.XY):
        with Locations((56.7037854344, 11.9056359399)):
            Rectangle(F17_W_5, F17_H_6)
        with Locations((39.2824709415, 19.8512687348)):
            Rectangle(F17_W_6, F17_H_7)
        with Locations((56.7037854344, 19.8512687348)):
            Rectangle(F17_W_5, F17_H_7)
    extrude(amount=F18_DEPTH)

    # F19#3: fillet of radius 25 on 2 edges, made by hand

    # F19_3_s2 → F19_3_t1 (cut)
    with BuildSketch(Plane.XY.offset(-58.2038957804)):
        with BuildLine():
            ThreePointArc((61.0945262015, 7.6483818702), (51.9069673171, 19.1881142343), (37.8129678893, 23.53964746))
            Line((37.8129678893, 23.53964746), (61.0945262015, 23.53964746))
            Line((61.0945262015, 23.53964746), (61.0945262015, 7.6483818702))
        make_face()
    extrude(amount=F19_3_T1_DEPTH, mode=Mode.SUBTRACT)

    # F19_3_s4 → F19_3_t3 (cut)
    with BuildSketch(Plane.XY.offset(-44.3298236263)):
        with BuildLine():
            ThreePointArc((43.9838266664, 23.53964746), (34.3812505469, 21.6219032395), (26.2518972158, 16.1628900096))
            Line((26.2518972158, 16.1628900096), (26.2518972158, 23.53964746))
            Line((26.2518972158, 23.53964746), (43.9838266664, 23.53964746))
        make_face()
    extrude(amount=F19_3_T3_DEPTH, mode=Mode.SUBTRACT)

    # F20 (on Top) → F21 (join)
    with BuildSketch(Plane.XY):
        with Locations((30.7842679322, 13.5714998469)):
            Circle(F20_R)
    extrude(amount=F21_DEPTH)

    # F22#2
    f22_2_edges = [f18c.edges().sort_by_distance(p)[0] for p in [
        (52.313045, 16.16289, 2.5),
    ]]
    fillet(f22_2_edges, radius=F22_2_R)


solid = Compound([f1_2.part, f7.part, f18.part, f18b.part, f18c.part])
